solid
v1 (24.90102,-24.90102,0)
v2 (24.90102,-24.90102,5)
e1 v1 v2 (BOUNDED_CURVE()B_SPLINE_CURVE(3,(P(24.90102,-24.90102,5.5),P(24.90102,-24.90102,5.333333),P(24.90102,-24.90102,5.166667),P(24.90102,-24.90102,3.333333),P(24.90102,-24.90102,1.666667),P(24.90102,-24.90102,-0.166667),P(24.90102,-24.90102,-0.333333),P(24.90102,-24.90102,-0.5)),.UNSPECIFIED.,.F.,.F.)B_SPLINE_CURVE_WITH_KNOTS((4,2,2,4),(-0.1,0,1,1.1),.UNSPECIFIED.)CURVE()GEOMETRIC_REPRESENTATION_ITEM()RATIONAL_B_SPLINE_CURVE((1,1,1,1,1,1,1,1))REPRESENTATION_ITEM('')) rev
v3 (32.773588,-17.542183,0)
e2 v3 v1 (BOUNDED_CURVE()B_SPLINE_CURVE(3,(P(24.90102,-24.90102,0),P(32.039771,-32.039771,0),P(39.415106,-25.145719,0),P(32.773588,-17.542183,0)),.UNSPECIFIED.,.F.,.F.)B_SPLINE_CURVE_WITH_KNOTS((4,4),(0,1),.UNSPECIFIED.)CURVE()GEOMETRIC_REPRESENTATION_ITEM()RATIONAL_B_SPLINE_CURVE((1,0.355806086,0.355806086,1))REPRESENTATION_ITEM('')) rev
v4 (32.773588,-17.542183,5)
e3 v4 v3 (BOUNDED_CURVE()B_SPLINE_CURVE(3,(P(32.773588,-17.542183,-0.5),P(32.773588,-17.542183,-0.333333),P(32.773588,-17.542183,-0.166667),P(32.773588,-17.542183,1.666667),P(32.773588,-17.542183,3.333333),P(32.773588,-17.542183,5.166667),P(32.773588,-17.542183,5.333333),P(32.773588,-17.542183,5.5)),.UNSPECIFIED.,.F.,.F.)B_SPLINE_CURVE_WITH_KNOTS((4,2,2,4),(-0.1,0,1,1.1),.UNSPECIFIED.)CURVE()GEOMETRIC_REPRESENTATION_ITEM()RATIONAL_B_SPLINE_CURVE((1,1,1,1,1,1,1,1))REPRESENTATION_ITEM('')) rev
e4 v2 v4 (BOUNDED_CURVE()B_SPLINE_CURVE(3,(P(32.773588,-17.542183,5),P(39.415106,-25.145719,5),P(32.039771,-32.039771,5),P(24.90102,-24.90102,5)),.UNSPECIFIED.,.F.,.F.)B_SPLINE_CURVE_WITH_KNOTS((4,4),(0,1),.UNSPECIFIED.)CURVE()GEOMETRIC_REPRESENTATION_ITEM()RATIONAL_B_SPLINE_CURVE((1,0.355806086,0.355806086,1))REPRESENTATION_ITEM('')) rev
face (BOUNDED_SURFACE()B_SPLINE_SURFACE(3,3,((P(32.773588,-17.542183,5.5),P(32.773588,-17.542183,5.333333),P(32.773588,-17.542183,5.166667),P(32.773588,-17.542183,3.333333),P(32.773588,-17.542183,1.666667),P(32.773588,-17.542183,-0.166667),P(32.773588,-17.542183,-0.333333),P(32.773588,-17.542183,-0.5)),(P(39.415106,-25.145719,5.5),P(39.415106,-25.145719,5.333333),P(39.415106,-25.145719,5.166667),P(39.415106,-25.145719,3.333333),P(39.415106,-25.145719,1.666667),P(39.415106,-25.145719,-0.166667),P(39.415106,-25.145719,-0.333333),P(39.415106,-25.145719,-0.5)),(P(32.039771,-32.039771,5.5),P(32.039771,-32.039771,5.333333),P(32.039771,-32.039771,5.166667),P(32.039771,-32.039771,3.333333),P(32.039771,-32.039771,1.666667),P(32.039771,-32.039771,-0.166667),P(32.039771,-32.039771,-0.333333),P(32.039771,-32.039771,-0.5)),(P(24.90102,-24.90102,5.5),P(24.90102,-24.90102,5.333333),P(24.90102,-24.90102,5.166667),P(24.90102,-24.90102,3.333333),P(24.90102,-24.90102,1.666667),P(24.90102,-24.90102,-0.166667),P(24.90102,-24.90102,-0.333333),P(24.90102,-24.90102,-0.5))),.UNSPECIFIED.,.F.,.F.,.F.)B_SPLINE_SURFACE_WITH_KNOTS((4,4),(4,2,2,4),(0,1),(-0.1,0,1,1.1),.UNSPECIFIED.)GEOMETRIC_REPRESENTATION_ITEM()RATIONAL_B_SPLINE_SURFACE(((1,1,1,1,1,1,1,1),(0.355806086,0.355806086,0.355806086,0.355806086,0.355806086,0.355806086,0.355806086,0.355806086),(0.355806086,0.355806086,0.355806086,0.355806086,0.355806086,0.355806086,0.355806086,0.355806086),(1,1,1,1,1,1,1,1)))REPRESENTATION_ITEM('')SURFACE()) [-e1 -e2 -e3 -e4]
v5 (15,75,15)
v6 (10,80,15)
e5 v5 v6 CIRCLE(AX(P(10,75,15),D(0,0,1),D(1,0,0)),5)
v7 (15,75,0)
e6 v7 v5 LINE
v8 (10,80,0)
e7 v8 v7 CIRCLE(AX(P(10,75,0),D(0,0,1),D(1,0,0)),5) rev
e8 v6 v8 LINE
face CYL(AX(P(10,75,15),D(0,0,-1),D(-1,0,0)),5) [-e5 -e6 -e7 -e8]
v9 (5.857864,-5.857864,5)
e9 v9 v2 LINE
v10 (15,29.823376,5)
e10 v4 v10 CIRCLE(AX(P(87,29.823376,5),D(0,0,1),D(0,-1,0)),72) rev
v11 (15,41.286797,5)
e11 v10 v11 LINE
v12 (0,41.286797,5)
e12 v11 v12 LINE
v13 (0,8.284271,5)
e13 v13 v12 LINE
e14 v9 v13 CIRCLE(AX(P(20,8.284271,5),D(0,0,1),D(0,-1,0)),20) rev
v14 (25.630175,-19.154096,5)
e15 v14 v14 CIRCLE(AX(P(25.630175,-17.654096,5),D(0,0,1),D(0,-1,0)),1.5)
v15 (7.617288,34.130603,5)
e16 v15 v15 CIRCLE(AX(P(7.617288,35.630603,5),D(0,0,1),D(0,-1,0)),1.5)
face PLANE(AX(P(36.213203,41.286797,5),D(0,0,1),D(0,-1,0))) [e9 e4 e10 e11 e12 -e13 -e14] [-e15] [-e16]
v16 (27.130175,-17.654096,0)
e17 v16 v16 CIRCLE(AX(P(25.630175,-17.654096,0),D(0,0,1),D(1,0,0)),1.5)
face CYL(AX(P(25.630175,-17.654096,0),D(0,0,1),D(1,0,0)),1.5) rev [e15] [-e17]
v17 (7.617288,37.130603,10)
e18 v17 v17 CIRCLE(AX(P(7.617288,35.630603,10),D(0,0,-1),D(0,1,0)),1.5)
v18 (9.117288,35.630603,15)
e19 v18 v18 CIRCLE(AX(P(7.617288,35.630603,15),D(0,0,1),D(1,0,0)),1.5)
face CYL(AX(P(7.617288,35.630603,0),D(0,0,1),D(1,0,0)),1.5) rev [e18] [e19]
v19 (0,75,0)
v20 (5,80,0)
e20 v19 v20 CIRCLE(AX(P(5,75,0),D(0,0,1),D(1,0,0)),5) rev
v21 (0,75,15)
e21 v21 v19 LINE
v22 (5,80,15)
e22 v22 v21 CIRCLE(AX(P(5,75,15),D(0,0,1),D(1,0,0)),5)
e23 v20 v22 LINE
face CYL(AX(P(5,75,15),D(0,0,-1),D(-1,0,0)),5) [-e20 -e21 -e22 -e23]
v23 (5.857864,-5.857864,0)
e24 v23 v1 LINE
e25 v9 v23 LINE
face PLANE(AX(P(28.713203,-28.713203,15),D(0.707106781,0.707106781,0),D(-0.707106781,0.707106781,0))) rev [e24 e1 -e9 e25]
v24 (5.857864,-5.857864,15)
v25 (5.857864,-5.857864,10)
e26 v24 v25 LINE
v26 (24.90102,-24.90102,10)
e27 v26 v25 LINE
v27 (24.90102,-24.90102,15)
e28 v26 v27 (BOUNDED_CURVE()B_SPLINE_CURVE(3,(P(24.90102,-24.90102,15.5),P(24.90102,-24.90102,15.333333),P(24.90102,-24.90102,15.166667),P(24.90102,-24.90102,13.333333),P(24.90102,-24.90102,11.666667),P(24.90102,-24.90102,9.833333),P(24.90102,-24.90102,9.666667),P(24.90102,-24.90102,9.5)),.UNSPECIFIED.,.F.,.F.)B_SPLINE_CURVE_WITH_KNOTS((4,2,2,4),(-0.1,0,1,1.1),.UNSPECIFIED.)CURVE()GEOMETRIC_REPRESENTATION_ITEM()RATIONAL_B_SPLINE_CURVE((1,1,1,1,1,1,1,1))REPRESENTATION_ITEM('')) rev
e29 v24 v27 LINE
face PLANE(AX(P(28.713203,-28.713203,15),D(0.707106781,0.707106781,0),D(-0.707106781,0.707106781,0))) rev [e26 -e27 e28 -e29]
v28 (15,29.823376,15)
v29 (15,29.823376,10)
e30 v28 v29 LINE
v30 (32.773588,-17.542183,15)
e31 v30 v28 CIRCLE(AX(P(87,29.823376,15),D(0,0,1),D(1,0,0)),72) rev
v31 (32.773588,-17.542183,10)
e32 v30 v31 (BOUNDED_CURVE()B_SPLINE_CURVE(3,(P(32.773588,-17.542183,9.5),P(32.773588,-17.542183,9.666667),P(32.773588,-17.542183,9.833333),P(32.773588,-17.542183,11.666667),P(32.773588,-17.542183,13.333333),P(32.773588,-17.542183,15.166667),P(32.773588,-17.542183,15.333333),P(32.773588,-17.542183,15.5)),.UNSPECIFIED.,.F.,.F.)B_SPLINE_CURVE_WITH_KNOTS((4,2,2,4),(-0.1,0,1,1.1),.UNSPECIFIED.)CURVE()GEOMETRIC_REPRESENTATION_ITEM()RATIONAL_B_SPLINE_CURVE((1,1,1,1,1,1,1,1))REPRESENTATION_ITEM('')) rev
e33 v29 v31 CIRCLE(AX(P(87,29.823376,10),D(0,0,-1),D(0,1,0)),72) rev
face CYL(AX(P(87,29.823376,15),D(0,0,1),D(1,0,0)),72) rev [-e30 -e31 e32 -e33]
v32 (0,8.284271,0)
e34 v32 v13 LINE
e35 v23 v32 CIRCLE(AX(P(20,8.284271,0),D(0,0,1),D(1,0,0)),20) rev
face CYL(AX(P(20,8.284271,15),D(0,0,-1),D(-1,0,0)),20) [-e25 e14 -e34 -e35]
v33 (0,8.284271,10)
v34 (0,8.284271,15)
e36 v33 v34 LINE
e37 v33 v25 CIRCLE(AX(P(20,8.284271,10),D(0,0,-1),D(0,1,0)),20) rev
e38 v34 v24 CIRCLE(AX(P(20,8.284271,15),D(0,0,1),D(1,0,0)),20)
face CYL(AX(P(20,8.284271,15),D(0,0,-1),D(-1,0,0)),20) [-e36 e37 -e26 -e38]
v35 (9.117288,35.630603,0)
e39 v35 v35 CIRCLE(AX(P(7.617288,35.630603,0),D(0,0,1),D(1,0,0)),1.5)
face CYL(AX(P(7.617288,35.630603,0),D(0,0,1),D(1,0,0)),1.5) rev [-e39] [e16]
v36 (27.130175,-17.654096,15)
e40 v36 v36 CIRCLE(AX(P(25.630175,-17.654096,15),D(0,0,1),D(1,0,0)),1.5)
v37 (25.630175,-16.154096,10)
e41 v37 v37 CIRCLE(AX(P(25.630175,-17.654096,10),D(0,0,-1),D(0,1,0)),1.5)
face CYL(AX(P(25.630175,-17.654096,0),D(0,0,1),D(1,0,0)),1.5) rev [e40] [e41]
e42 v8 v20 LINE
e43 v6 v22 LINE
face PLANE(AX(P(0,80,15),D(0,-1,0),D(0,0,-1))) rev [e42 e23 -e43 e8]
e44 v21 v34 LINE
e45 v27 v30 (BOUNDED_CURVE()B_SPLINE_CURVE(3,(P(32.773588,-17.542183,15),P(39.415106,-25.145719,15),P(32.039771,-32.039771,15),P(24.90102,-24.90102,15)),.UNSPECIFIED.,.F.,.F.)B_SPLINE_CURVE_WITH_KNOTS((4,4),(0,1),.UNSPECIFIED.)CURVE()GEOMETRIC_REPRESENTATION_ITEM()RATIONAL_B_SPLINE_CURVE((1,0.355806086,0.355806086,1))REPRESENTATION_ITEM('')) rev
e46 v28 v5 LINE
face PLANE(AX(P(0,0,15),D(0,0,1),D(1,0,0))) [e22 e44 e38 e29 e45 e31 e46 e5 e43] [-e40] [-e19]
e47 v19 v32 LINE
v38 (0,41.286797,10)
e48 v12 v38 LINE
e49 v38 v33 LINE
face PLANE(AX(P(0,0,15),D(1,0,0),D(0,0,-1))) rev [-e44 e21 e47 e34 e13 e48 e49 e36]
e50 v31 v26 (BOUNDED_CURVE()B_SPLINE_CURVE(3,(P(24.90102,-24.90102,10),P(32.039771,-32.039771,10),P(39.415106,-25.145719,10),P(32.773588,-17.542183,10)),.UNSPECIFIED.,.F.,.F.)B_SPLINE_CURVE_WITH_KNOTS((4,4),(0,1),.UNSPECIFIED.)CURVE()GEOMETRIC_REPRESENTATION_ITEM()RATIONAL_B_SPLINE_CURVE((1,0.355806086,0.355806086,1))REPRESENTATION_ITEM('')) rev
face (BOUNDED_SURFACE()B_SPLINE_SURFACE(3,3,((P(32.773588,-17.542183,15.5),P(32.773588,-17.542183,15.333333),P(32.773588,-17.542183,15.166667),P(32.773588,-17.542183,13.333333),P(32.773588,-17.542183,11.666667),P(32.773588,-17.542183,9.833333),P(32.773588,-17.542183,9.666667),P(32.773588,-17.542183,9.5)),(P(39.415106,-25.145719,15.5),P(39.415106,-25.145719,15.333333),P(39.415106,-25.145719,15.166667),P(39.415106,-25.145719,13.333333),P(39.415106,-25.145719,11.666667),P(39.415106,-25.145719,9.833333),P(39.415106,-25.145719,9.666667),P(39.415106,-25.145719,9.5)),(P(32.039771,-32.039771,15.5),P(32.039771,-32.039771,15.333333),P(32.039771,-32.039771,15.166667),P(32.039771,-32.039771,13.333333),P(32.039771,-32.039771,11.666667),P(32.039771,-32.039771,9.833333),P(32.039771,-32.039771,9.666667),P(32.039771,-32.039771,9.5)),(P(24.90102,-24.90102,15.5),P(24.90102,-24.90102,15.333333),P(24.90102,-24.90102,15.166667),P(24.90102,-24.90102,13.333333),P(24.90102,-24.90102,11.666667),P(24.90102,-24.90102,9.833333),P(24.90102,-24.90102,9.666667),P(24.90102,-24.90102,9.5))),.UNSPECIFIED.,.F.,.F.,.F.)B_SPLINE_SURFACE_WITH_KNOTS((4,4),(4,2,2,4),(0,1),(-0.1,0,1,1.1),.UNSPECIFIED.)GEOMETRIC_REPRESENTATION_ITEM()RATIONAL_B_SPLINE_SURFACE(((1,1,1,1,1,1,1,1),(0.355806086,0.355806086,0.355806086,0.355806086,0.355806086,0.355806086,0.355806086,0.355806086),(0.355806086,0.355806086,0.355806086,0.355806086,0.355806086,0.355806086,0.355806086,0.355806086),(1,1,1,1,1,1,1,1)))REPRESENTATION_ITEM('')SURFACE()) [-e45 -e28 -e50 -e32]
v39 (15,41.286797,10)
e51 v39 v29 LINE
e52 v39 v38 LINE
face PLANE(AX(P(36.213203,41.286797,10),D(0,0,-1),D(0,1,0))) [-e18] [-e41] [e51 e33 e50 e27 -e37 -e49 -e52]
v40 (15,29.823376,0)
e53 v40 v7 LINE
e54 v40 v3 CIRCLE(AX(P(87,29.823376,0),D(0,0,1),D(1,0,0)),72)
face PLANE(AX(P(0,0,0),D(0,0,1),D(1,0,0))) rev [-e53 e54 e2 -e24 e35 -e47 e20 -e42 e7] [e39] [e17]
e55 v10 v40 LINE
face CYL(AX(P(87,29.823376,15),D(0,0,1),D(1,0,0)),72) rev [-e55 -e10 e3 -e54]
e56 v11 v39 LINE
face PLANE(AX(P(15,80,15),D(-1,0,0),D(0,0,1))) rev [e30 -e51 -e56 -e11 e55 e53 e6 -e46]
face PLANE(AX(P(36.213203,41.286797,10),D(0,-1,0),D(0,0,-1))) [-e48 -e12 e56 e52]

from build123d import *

# Parameters (mm, degrees)
BOSS_EXTRU_1_DEPTH      = 15
CONG_1_R                = 72
CONG_2_R                = 20
ESQUISSE2_W             = 5
ESQUISSE2_H             = 70
ENL_V_MAT_EXTRU_1_DEPTH = 90.086452972
ESQUISSE3_R             = 1.5
ENL_V_MAT_EXTRU_2_DEPTH = 90.086452972
CONG_3_R                = 5
CONG_4_START            = 9
CONG_4_DEPTH            = 7
CONG_5_START            = -1
CONG_5_DEPTH            = 7


with BuildPart() as part:
    # Esquisse1 → Boss.-Extru.1 (new body)
    with BuildSketch(Plane.XY):
        Polygon((0, 0), (0, 80), (15, 80), (15, 0), (36.213203436, -21.213203436), (28.713203436, -28.713203436), align=None)
    extrude(amount=BOSS_EXTRU_1_DEPTH)

    # Congé1
    cong_1_edges = [part.edges().sort_by_distance(p)[0] for p in [
        (15, 0, 7.5),
    ]]
    fillet(cong_1_edges, radius=CONG_1_R)

    # Congé2
    cong_2_edges = [part.edges().sort_by_distance(p)[0] for p in [
        (0, 0, 7.5),
    ]]
    fillet(cong_2_edges, radius=CONG_2_R)

    # Esquisse2 → Enlèv. mat.-Extru.1 (cut, through all)
    with BuildSketch(Plane(origin=(0, 0, 0), x_dir=(0, 0, -1), z_dir=(1, 0, 0))):
        with Locations((-7.5, 6.286796564)):
            Rectangle(ESQUISSE2_W, ESQUISSE2_H)
    extrude(amount=ENL_V_MAT_EXTRU_1_DEPTH, mode=Mode.SUBTRACT)

    # Esquisse3 → Enlèv. mat.-Extru.2 (cut, through all)
    with BuildSketch(Plane.XY.offset(15)):
        with Locations((7.61728785, 35.6306026)):
            Circle(ESQUISSE3_R)
        with Locations((25.630175336, -17.654095912)):
            Circle(ESQUISSE3_R)
    extrude(amount=-ENL_V_MAT_EXTRU_2_DEPTH, mode=Mode.SUBTRACT)

    # Congé3
    cong_3_edges = [part.edges().sort_by_distance(p)[0] for p in [
        (0, 80, 7.5),
        (15, 80, 7.5),
    ]]
    fillet(cong_3_edges, radius=CONG_3_R)

    # Congé4: read off the stored shape, not the designer's step
    # Congé4 outline → Congé4 (cut)
    with BuildSketch(Plane.XY.offset(CONG_4_START)):
        with BuildLine():
            ThreePointArc((36.088311756, -21.088311756), (34.40105692, -19.343189251), (32.773587535, -17.542182633))
            add(Edge.make_bspline(
                [(32.773587535, -17.542182633), (34.472065544, -19.486683464), (34.913542675, -22.512864199), (32.525386467, -24.901020408)],
                knots=[0, 0, 0, 0, 0.49128121, 0.49128121, 0.49128121, 0.49128121], degree=3, weights=[1, 0.683519634, 0.522520126, 0.517001474]))
            Line((32.525386467, -24.901020408), (36.213203437, -21.213203437))
            Line((36.213203437, -21.213203437), (36.088311756, -21.088311756))
        make_face()
        with BuildLine():
            Line((28.713203437, -28.713203437), (32.525386467, -24.901020408))
            add(Edge.make_bspline(
                [(32.525386467, -24.901020408), (29.99813373, -27.428273144), (26.823045344, -26.823045346), (24.901020406, -24.901020406)],
                knots=[0.49128121, 0.49128121, 0.49128121, 0.49128121, 1, 1, 1, 1], degree=3, weights=[0.517001474, 0.511286943, 0.672286452, 1]))
            Line((24.901020406, -24.901020406), (28.713203437, -28.713203437))
        make_face()
    extrude(amount=CONG_4_DEPTH, mode=Mode.SUBTRACT)

    # Congé5: read off the stored shape, not the designer's step
    # Congé5 outline → Congé5 (cut)
    with BuildSketch(Plane.XY.offset(CONG_5_START)):
        with BuildLine():
            ThreePointArc((36.088311755, -21.088311755), (34.401056918, -19.343189249), (32.773587531, -17.542182629))
            add(Edge.make_bspline(
                [(32.773587531, -17.542182629), (34.472065541, -19.486683459), (34.913542673, -22.512864192), (32.525386468, -24.901020401)],
                knots=[0, 0, 0, 0, 0.49128121, 0.49128121, 0.49128121, 0.49128121], degree=3, weights=[1, 0.683519634, 0.522520126, 0.517001474]))
            Line((32.525386468, -24.901020401), (36.213203436, -21.213203436))
            Line((36.213203436, -21.213203436), (36.088311755, -21.088311755))
        make_face()
        with BuildLine():
            Line((28.713203436, -28.713203436), (32.525386468, -24.901020401))
            add(Edge.make_bspline(
                [(32.525386468, -24.901020401), (29.998133731, -27.428273143), (26.823045342, -26.823045344), (24.901020402, -24.901020402)],
                knots=[0.49128121, 0.49128121, 0.49128121, 0.49128121, 1, 1, 1, 1], degree=3, weights=[0.517001474, 0.511286943, 0.672286451, 1]))
            Line((24.901020402, -24.901020402), (28.713203436, -28.713203436))
        make_face()
    extrude(amount=CONG_5_DEPTH, mode=Mode.SUBTRACT)


solid = part.part
